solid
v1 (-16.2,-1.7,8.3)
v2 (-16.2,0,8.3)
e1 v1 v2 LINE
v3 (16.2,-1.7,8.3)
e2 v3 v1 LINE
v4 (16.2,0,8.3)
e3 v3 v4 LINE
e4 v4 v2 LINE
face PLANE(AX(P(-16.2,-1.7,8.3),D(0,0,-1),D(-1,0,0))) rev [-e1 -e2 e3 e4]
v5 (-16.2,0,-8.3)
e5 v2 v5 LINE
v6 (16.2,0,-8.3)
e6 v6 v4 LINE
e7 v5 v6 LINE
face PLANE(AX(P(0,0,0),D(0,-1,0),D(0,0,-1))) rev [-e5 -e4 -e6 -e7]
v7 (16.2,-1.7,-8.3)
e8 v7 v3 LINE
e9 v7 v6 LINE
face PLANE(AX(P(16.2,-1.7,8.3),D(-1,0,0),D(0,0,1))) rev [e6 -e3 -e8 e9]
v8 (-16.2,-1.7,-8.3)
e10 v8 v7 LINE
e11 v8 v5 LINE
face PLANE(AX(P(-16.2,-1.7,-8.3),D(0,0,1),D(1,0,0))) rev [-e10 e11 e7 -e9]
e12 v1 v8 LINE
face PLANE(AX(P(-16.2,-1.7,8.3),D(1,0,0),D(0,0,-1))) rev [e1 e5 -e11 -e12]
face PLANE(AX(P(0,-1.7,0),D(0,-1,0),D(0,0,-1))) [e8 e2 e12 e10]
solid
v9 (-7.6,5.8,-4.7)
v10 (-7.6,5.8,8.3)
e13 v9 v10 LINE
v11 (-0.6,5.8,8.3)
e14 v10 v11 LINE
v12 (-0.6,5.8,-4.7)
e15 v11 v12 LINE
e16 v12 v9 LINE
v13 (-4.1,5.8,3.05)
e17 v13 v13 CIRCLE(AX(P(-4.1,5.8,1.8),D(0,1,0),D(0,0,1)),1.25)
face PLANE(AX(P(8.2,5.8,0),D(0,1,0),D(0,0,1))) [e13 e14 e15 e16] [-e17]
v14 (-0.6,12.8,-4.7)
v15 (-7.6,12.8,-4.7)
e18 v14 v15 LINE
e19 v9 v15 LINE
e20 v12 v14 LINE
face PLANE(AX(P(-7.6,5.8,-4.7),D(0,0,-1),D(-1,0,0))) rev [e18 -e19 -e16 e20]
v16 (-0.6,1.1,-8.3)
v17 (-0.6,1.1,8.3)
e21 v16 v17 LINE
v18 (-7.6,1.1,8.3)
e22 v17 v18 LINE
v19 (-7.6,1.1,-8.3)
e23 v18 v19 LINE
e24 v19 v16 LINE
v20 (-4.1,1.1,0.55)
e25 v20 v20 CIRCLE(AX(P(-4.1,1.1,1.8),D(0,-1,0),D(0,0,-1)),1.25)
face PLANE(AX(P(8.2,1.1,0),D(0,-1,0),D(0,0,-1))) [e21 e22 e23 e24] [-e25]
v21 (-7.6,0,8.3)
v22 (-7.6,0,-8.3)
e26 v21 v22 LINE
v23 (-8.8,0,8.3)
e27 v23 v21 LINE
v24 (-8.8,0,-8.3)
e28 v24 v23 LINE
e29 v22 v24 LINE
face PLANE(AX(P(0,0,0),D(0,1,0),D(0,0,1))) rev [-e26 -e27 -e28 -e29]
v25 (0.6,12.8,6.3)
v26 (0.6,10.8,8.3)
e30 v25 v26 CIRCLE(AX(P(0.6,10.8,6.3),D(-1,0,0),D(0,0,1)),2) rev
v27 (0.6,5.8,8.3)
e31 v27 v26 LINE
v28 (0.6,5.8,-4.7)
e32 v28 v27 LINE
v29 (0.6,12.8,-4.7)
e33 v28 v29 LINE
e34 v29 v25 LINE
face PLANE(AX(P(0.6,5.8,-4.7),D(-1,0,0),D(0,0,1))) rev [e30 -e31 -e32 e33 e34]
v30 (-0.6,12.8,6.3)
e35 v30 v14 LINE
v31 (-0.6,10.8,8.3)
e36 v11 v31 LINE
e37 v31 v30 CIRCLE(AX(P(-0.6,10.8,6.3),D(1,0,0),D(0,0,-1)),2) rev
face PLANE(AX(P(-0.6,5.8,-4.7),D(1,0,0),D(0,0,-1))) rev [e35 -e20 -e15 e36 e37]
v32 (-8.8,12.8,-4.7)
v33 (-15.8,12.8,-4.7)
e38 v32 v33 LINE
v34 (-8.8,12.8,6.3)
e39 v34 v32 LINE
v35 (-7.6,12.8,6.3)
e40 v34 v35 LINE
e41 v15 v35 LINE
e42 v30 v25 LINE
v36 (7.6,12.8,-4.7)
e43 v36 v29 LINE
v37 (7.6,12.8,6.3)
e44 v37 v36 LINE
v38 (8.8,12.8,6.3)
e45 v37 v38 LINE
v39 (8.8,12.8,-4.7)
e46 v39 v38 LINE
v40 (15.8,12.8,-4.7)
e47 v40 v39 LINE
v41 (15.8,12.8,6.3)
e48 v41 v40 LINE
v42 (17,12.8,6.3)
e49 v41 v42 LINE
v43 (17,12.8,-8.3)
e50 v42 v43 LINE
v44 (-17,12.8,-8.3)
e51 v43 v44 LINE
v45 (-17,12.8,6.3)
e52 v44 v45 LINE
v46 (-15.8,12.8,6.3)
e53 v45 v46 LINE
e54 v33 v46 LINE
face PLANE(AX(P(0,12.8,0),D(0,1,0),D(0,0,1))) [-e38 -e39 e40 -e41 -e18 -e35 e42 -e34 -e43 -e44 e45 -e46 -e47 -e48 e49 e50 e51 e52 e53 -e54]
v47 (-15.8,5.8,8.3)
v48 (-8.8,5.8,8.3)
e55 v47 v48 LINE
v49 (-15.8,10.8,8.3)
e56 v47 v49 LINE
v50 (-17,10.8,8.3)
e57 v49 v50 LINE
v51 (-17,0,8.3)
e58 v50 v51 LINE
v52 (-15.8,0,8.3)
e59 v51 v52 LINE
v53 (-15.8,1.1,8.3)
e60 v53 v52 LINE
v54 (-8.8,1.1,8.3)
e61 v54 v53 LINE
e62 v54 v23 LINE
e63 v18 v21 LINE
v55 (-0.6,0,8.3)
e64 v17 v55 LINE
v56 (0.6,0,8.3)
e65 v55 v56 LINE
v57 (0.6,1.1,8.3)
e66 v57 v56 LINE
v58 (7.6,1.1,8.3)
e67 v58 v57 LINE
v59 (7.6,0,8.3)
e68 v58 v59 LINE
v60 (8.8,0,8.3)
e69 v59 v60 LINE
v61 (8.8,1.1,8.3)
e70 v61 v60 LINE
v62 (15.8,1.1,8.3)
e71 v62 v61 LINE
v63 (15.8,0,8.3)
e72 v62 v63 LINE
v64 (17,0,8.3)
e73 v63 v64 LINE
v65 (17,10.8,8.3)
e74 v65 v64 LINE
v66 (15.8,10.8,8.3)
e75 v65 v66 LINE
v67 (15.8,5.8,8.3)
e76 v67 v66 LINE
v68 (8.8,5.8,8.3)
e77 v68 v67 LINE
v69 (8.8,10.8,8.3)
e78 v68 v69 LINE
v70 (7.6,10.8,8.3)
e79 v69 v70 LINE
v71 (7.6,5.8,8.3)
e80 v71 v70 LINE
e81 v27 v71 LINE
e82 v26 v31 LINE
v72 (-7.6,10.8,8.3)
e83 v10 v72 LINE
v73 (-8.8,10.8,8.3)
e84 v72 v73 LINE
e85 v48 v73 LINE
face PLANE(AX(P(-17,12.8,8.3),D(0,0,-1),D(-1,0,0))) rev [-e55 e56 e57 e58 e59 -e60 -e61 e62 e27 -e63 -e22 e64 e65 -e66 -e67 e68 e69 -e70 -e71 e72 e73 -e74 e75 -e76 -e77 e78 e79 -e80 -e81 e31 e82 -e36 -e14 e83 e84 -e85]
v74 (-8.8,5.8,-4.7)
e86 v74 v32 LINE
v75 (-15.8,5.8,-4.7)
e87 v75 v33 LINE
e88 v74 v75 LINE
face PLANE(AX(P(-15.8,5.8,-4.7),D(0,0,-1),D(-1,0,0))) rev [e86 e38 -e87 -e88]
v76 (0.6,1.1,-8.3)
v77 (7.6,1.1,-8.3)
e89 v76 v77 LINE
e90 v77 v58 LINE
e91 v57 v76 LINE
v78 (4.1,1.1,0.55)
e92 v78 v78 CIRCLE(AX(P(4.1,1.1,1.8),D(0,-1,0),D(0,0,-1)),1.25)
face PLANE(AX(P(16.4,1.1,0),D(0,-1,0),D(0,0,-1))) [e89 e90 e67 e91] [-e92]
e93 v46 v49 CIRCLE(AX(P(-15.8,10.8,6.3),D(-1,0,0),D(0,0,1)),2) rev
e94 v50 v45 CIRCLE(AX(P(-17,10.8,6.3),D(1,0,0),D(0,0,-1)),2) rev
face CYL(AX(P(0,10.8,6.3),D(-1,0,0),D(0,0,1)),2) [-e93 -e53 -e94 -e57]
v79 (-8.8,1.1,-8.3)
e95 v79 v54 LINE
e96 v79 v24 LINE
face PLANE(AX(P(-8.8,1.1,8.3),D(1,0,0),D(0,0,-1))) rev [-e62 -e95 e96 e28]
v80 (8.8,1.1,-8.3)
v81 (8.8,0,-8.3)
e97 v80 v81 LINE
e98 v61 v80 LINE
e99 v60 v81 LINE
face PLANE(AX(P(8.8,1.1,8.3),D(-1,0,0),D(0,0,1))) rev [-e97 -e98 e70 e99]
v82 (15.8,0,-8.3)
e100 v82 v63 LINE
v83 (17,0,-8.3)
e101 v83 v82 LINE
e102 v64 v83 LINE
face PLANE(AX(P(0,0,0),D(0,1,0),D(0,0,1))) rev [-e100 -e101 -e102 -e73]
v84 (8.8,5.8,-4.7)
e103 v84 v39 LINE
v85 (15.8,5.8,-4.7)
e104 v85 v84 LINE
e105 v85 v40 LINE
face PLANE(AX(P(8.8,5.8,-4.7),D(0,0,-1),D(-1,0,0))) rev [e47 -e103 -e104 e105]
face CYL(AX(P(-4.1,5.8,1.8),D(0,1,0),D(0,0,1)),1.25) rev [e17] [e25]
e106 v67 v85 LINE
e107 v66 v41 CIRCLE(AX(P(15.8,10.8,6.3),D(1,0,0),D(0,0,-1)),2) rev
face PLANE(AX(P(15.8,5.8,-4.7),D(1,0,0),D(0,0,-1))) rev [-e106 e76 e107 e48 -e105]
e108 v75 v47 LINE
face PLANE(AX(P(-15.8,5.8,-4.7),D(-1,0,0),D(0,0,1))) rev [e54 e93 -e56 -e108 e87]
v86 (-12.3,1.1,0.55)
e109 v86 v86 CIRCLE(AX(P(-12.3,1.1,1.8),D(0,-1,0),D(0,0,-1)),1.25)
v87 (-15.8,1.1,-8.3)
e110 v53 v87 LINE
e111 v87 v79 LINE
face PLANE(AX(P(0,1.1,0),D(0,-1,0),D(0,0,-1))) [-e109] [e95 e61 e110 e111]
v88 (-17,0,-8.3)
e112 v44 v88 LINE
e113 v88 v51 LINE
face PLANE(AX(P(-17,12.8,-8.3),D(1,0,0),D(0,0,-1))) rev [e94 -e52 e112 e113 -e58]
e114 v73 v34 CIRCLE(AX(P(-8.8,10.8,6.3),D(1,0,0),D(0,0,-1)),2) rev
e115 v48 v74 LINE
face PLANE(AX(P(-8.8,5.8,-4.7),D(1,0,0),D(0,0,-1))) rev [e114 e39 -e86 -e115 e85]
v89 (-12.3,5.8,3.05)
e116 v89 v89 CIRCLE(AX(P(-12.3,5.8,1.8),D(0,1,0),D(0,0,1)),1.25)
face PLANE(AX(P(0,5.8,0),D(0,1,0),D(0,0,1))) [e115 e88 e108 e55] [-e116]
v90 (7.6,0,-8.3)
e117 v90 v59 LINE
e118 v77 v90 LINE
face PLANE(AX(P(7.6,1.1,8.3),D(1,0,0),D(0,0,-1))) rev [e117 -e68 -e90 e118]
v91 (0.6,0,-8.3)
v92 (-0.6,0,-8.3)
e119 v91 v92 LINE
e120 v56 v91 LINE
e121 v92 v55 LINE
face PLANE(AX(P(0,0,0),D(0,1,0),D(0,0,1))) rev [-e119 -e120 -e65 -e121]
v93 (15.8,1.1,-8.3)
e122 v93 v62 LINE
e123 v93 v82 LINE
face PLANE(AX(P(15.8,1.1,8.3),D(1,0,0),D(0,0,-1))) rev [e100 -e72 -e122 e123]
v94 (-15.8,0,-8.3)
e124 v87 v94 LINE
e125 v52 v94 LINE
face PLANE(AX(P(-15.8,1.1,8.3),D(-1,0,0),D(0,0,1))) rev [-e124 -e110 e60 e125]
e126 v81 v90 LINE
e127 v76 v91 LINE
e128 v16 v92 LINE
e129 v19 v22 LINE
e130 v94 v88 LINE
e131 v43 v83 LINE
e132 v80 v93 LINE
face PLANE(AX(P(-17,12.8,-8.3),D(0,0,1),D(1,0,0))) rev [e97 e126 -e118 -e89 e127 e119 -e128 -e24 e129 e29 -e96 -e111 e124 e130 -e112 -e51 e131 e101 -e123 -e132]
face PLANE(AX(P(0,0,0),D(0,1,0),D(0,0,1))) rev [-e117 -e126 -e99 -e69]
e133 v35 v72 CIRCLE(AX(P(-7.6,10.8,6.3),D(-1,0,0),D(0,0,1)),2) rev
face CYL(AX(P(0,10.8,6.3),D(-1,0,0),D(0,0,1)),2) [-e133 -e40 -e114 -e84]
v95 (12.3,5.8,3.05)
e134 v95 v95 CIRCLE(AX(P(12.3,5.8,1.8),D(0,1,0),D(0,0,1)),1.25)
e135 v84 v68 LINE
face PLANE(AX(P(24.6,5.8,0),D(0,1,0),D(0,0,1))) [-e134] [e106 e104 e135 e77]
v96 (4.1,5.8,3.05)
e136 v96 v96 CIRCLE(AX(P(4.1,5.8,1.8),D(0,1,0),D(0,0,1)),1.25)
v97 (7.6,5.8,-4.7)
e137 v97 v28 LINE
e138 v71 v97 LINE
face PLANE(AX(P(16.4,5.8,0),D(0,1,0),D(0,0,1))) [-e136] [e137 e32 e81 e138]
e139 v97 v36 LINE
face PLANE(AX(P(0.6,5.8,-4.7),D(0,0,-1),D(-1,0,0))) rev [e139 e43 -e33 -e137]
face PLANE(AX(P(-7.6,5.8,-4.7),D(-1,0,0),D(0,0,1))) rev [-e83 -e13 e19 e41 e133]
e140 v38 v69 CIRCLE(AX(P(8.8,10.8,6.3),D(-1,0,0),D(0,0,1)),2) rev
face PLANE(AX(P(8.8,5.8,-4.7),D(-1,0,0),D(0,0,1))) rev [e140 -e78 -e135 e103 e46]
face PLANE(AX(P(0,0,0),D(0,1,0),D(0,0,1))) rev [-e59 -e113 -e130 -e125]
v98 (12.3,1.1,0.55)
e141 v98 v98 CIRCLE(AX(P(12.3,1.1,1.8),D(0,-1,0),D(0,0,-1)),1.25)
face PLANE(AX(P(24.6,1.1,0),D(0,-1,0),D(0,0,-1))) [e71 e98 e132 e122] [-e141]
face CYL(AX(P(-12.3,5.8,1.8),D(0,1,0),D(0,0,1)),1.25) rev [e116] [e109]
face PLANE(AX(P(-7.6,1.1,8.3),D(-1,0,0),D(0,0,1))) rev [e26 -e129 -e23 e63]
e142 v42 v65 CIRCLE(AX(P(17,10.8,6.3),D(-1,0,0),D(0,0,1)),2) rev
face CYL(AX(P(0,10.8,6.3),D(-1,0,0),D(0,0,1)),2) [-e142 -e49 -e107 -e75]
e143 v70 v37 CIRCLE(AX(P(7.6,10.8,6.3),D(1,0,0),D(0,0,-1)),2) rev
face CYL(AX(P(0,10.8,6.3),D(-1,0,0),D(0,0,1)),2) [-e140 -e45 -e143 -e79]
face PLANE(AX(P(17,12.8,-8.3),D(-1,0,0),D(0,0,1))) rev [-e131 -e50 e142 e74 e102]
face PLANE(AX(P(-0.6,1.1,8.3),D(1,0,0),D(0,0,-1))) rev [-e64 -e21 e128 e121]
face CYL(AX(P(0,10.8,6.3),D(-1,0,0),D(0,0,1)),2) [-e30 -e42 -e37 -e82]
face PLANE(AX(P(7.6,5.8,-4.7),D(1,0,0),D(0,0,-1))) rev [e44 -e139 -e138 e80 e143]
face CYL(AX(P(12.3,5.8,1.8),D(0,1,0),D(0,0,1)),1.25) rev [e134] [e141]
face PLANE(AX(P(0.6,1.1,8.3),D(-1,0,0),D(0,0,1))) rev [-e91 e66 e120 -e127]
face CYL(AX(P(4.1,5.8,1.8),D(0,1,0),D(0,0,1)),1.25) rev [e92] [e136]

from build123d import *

# Parameters (mm, degrees)
SKETCH1_W                 = 34
SKETCH1_H                 = 16.6
BOSS_EXTRUDE1_DEPTH       = 12.8
SKETCH2_W                 = 7
SKETCH2_H                 = 16.6
CUT_EXTRUDE1_DEPTH        = 1.1
FILL_PATTERN1_OUTLINE_W   = 7
FILL_PATTERN1_OUTLINE_H   = 16.6
FILL_PATTERN1_DEPTH       = 1.1
FILLET1_R                 = 2
SKETCH3_W                 = 7
SKETCH3_H                 = 13
CUT_EXTRUDE2_DEPTH        = 7
M3X0_5_TAPPED_HOLE1_D     = 2.5
FILL_START                = 5.8
FILL_PATTERN2_OUTLINE_W   = 7
FILL_PATTERN2_OUTLINE_H   = 13
FILL_PATTERN2_DEPTH       = 7
FILL_START_2              = 1.1
FILL_PATTERN2_2_OUTLINE_R = 1.25
FILL_PATTERN2_2_DEPTH     = 4.7
SKETCH4_W                 = 32.4
SKETCH4_H                 = 16.6
BOSS_EXTRUDE2_DEPTH       = 1.7


# Read off the part's stored shape, not the designer's step: Fill Pattern1, Fill Pattern2
with BuildPart() as part:
    # Sketch1 → Boss-Extrude1 (new body)
    with BuildSketch(Plane(origin=(0, 0, 0), x_dir=(1, 0, 0), z_dir=(0, 1, 0))):
        Rectangle(SKETCH1_W, SKETCH1_H)
    extrude(amount=BOSS_EXTRUDE1_DEPTH)

    # Sketch2 → Cut-Extrude1 (cut)
    with BuildSketch(Plane.XZ):
        with Locations((-12.3, 0)):
            Rectangle(SKETCH2_W, SKETCH2_H)
    extrude(amount=-CUT_EXTRUDE1_DEPTH, mode=Mode.SUBTRACT)

    # Fill Pattern1 outline → Fill Pattern1 (cut)
    with BuildSketch(Plane(origin=(0, 0, 0), x_dir=(1, 0, 0), z_dir=(0, 1, 0))):
        with Locations((12.3, 0)):
            Rectangle(FILL_PATTERN1_OUTLINE_W, FILL_PATTERN1_OUTLINE_H)
        with Locations((4.1, 0)):
            Rectangle(FILL_PATTERN1_OUTLINE_W, FILL_PATTERN1_OUTLINE_H)
        with Locations((-4.1, 0)):
            Rectangle(FILL_PATTERN1_OUTLINE_W, FILL_PATTERN1_OUTLINE_H)
    extrude(amount=FILL_PATTERN1_DEPTH, mode=Mode.SUBTRACT)

    # Fillet1
    fillet1_edges = [part.edges().sort_by_distance(p)[0] for p in [
        (0, 12.8, 8.3),
    ]]
    fillet(fillet1_edges, radius=FILLET1_R)

    # Sketch3 → Cut-Extrude2 (cut)
    with BuildSketch(Plane(origin=(0, 12.8, 0), x_dir=(1, 0, 0), z_dir=(0, 1, 0))):
        with Locations((-12.3, -1.8)):
            Rectangle(SKETCH3_W, SKETCH3_H)
    extrude(amount=-CUT_EXTRUDE2_DEPTH, mode=Mode.SUBTRACT)

    # M3x0.5 Tapped Hole1 (through all)
    with Locations(Plane(origin=(0, 5.8, 0), x_dir=(1, 0, 0), z_dir=(0, 1, 0))):
        with Locations((-12.3, -1.8)):
            Hole(M3X0_5_TAPPED_HOLE1_D / 2)

    # Fill Pattern2 outline → Fill Pattern2 (cut)
    with BuildSketch(Plane(origin=(0, 0, 0), x_dir=(1, 0, 0), z_dir=(0, 1, 0)).offset(FILL_START)):
        with Locations((12.3, -1.8)):
            Rectangle(FILL_PATTERN2_OUTLINE_W, FILL_PATTERN2_OUTLINE_H)
        with Locations((-4.1, -1.8)):
            Rectangle(FILL_PATTERN2_OUTLINE_W, FILL_PATTERN2_OUTLINE_H)
        with Locations((4.1, -1.8)):
            Rectangle(FILL_PATTERN2_OUTLINE_W, FILL_PATTERN2_OUTLINE_H)
    extrude(amount=FILL_PATTERN2_DEPTH, mode=Mode.SUBTRACT)

    # Fill Pattern2 2 outline → Fill Pattern2 2 (cut)
    with BuildSketch(Plane(origin=(0, 0, 0), x_dir=(1, 0, 0), z_dir=(0, 1, 0)).offset(FILL_START_2)):
        with Locations((12.3, -1.8)):
            Circle(FILL_PATTERN2_2_OUTLINE_R)
        with Locations((4.1, -1.8)):
            Circle(FILL_PATTERN2_2_OUTLINE_R)
        with Locations((-4.1, -1.8)):
            Circle(FILL_PATTERN2_2_OUTLINE_R)
    extrude(amount=FILL_PATTERN2_2_DEPTH, mode=Mode.SUBTRACT)


with BuildPart() as body_2:
    # Sketch4 → Boss-Extrude2 (new body)
    with BuildSketch(Plane.XZ):
        Rectangle(SKETCH4_W, SKETCH4_H)
    extrude(amount=BOSS_EXTRUDE2_DEPTH)


solid = Compound([part.part, body_2.part])
